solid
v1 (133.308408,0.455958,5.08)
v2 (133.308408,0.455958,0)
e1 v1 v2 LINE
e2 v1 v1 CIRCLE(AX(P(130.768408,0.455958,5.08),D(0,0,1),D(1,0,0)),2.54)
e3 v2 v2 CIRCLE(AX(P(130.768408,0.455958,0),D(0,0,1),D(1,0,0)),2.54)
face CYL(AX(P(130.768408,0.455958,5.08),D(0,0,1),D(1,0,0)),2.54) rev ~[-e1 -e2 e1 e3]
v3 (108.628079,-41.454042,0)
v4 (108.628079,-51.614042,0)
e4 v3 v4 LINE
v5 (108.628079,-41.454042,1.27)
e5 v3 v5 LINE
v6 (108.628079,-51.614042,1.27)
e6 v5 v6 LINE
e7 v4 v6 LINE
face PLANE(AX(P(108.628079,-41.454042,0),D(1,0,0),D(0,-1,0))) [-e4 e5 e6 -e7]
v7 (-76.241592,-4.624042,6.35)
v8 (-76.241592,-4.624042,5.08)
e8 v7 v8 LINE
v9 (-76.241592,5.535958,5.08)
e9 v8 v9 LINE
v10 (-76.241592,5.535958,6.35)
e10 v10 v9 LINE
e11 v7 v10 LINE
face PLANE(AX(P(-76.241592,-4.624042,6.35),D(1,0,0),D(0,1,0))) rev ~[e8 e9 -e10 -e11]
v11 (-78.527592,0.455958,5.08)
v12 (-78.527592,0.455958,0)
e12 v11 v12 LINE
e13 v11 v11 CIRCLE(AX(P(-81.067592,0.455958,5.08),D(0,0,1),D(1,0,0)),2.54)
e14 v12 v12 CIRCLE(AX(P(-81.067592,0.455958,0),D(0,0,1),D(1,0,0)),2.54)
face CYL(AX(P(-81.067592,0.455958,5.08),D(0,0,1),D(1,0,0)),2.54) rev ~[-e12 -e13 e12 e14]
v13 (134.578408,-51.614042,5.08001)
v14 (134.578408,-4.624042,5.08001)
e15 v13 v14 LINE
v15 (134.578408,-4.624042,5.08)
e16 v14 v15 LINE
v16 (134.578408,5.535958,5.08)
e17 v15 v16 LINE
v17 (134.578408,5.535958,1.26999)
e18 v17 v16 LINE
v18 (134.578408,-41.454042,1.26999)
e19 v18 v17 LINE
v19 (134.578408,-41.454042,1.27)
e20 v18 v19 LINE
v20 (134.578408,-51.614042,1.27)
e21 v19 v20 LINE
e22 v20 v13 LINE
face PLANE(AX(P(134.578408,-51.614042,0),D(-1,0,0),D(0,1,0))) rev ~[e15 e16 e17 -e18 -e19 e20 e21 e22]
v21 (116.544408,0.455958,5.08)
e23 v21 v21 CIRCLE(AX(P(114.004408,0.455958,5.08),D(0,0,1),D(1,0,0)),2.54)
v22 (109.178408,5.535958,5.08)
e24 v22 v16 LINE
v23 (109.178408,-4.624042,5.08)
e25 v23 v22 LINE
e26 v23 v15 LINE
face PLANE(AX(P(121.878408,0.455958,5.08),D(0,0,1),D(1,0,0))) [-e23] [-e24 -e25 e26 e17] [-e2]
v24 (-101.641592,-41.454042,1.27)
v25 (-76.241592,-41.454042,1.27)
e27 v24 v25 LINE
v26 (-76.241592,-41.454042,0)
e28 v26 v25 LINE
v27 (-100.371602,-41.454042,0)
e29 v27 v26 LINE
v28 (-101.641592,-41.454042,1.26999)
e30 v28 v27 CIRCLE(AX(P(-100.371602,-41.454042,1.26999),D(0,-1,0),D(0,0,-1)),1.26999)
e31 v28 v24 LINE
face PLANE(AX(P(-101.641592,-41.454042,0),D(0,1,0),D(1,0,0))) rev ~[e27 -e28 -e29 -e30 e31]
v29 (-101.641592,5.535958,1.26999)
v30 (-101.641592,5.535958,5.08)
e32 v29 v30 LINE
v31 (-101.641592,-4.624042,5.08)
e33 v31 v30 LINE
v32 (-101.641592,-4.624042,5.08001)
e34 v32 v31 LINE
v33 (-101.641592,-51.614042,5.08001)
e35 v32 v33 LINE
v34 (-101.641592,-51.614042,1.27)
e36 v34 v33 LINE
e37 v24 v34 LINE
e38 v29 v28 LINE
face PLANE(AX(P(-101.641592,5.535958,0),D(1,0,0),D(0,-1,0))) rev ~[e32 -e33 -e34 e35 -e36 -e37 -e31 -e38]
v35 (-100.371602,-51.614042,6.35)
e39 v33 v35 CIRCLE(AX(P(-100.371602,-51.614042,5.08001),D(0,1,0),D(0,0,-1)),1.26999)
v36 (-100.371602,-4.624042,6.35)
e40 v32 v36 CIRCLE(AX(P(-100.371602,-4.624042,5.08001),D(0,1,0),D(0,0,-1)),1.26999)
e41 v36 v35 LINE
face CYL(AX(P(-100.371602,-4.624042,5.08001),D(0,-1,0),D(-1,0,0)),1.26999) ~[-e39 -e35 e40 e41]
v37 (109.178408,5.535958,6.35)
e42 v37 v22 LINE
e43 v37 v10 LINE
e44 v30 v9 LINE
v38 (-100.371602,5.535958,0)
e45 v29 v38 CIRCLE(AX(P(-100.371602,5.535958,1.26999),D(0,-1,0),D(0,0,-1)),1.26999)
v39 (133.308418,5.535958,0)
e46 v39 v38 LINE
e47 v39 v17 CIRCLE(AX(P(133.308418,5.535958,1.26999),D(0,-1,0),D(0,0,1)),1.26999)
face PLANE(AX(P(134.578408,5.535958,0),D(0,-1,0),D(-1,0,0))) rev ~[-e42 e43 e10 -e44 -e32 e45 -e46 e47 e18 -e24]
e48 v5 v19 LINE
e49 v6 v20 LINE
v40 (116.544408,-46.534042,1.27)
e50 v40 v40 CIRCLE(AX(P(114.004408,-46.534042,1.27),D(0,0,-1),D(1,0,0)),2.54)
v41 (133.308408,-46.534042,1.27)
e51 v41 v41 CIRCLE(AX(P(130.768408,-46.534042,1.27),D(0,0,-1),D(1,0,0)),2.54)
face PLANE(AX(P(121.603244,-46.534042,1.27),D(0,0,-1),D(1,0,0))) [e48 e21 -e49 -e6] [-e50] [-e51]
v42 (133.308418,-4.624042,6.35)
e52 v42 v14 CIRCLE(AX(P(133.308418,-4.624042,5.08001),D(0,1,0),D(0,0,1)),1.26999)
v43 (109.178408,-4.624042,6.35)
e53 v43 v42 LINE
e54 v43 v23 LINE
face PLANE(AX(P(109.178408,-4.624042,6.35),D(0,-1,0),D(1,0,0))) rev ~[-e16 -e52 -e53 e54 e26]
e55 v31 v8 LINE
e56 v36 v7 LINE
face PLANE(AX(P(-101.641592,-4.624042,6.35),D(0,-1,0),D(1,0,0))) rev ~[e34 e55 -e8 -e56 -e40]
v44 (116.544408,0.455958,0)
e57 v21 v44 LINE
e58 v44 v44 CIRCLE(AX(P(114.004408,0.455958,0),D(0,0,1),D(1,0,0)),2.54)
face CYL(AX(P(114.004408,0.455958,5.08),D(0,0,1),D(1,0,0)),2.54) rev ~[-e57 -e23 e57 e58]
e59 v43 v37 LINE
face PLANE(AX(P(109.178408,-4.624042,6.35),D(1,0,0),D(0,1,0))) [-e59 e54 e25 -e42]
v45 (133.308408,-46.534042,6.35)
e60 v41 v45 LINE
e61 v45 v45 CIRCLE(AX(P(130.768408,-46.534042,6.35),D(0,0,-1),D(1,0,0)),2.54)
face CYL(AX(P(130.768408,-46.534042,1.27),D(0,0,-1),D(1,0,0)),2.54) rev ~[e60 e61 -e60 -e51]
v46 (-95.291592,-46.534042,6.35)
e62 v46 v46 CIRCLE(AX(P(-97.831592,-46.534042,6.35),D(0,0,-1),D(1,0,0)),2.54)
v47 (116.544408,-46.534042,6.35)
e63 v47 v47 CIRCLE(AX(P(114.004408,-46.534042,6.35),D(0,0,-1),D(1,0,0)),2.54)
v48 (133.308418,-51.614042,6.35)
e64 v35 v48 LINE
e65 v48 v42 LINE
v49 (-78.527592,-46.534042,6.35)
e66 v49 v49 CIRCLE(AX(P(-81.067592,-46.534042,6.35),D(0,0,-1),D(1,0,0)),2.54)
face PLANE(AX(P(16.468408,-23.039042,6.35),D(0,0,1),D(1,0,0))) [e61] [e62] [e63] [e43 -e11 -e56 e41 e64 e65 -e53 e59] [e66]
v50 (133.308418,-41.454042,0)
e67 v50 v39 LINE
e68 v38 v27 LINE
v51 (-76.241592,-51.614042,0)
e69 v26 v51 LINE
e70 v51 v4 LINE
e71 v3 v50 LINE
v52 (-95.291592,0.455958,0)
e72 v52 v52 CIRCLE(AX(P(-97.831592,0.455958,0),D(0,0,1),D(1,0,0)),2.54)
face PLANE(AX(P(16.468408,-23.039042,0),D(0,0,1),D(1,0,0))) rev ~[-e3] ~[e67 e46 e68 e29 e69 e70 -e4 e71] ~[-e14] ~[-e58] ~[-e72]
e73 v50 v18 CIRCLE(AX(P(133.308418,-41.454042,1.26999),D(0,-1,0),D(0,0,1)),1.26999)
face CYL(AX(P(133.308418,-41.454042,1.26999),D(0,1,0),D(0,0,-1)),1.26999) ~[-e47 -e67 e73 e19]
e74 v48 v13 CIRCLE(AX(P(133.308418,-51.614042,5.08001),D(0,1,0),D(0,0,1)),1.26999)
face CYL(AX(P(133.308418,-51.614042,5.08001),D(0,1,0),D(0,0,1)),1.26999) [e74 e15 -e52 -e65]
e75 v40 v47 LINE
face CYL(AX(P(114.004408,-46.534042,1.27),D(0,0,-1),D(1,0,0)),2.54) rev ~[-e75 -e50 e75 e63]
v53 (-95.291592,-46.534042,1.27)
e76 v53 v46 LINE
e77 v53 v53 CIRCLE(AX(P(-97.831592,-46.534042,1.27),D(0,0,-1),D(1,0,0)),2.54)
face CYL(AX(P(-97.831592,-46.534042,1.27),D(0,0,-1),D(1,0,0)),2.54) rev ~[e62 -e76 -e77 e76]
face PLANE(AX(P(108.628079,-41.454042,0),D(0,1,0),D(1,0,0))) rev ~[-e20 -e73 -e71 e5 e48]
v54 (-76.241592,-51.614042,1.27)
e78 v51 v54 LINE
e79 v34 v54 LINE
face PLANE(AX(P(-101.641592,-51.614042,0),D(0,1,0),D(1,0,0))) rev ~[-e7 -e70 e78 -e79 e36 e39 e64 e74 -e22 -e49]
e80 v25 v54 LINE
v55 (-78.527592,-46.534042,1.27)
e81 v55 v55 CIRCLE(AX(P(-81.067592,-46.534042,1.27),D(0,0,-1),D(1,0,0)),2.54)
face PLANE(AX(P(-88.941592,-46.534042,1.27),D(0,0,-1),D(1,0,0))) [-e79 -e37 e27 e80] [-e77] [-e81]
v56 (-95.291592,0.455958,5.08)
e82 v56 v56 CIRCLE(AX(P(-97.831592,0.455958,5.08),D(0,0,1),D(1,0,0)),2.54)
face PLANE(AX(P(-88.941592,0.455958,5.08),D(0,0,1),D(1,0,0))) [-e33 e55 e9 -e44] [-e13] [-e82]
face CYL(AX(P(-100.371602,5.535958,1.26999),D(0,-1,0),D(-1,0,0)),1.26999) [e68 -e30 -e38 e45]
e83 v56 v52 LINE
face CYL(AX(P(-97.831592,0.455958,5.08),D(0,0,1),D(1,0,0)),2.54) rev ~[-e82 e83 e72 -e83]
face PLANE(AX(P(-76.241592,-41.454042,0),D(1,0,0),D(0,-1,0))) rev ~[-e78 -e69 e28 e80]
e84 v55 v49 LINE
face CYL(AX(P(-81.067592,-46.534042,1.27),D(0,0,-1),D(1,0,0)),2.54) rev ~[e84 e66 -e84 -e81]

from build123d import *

# Parameters (mm, degrees)
F1_DEPTH  = 6.35
F2_W      = 25.4
F2_H      = 10.16
F3_DEPTH  = 1.27
F4_R      = 2.54
F5_DEPTH  = 25.4
F6_R      = 2.54
F7_DEPTH  = 25.4
F8_W      = 25.4
F8_H      = 10.16
F8_W_2    = 25.950329153
F9_DEPTH  = 1.27
F10_R     = 2.54
F11_DEPTH = 25.4
F12_R     = 2.54
F13_DEPTH = 25.4
F14_R     = 1.26999


# Not quite as in the source:
# - a fillet or chamfer is up to 0.001 mm smaller than in the source, because OpenCascade refuses the exact size


with BuildPart() as f1:
    # F0 (on Top) → F1 (new body)
    with BuildSketch(Plane.XY):
        Polygon((-53.3815915518, 5.5359576059), (-101.6415915518, 5.5359576059), (-101.6415915518, -51.6140423941), (-53.3815915518, -51.6140423941), (86.3184084482, -51.6140423941), (134.5784084482, -51.6140423941), (134.5784084482, 5.5359576059), (86.3184084482, 5.5359576059), align=None)
    extrude(amount=F1_DEPTH)

    # F2 (on face) → F3 (cut)
    with BuildSketch(Plane.XY.offset(6.35)):
        with Locations((-88.9415915518, 0.4559576059)):
            Rectangle(F2_W, F2_H)
        with Locations((121.8784084482, 0.4559576059)):
            Rectangle(F2_W, F2_H)
    extrude(amount=-F3_DEPTH, mode=Mode.SUBTRACT)

    # F4 (on face) → F5 (cut)
    with BuildSketch(Plane.XY.offset(5.08)):
        with Locations((-97.8315915518, 0.4559576059)):
            Circle(F4_R)
        with Locations((-81.0675915518, 0.4559576059)):
            Circle(F4_R)
    extrude(amount=-F5_DEPTH, mode=Mode.SUBTRACT)

    # F6 (on face) → F7 (cut)
    with BuildSketch(Plane.XY.offset(5.08)):
        with Locations((130.7684084482, 0.4559576059)):
            Circle(F6_R)
        with Locations((114.0044084482, 0.4559576059)):
            Circle(F6_R)
    extrude(amount=-F7_DEPTH, mode=Mode.SUBTRACT)

    # F8 (on face) → F9 (cut)
    with BuildSketch(Plane(origin=(0, 0, 0), x_dir=(1, 0, 0), z_dir=(0, 0, -1))):
        with Locations((-88.9415915518, 46.5340423941)):
            Rectangle(F8_W, F8_H)
        with Locations((121.6032438717, 46.5340423941)):
            Rectangle(F8_W_2, F8_H)
    extrude(amount=-F9_DEPTH, mode=Mode.SUBTRACT)

    # F10 (on face) → F11 (cut)
    with BuildSketch(Plane(origin=(0, 0, 1.27), x_dir=(1, 0, 0), z_dir=(0, 0, -1))):
        with Locations((-97.8315915518, 46.5340423941)):
            Circle(F10_R)
        with Locations((-81.0675915518, 46.5340423941)):
            Circle(F10_R)
    extrude(amount=-F11_DEPTH, mode=Mode.SUBTRACT)

    # F12 (on face) → F13 (cut)
    with BuildSketch(Plane(origin=(0, 0, 1.27), x_dir=(1, 0, 0), z_dir=(0, 0, -1))):
        with Locations((114.0044084482, 46.5340423941)):
            Circle(F12_R)
        with Locations((130.7684084482, 46.5340423941)):
            Circle(F12_R)
    extrude(amount=-F13_DEPTH, mode=Mode.SUBTRACT)

    # F14 (radius 1.27 in the source; OpenCascade refuses exactly that, so slightly less here)
    f14_edges = [f1.edges().sort_by_distance(p)[0] for p in [
        (134.578408, -28.119042, 6.35),
        (134.578408, -17.959042, 0),
        (-101.641592, -28.119042, 6.35),
        (-101.641592, -17.959042, 0),
    ]]
    fillet(f14_edges, radius=F14_R)


solid = f1.part
